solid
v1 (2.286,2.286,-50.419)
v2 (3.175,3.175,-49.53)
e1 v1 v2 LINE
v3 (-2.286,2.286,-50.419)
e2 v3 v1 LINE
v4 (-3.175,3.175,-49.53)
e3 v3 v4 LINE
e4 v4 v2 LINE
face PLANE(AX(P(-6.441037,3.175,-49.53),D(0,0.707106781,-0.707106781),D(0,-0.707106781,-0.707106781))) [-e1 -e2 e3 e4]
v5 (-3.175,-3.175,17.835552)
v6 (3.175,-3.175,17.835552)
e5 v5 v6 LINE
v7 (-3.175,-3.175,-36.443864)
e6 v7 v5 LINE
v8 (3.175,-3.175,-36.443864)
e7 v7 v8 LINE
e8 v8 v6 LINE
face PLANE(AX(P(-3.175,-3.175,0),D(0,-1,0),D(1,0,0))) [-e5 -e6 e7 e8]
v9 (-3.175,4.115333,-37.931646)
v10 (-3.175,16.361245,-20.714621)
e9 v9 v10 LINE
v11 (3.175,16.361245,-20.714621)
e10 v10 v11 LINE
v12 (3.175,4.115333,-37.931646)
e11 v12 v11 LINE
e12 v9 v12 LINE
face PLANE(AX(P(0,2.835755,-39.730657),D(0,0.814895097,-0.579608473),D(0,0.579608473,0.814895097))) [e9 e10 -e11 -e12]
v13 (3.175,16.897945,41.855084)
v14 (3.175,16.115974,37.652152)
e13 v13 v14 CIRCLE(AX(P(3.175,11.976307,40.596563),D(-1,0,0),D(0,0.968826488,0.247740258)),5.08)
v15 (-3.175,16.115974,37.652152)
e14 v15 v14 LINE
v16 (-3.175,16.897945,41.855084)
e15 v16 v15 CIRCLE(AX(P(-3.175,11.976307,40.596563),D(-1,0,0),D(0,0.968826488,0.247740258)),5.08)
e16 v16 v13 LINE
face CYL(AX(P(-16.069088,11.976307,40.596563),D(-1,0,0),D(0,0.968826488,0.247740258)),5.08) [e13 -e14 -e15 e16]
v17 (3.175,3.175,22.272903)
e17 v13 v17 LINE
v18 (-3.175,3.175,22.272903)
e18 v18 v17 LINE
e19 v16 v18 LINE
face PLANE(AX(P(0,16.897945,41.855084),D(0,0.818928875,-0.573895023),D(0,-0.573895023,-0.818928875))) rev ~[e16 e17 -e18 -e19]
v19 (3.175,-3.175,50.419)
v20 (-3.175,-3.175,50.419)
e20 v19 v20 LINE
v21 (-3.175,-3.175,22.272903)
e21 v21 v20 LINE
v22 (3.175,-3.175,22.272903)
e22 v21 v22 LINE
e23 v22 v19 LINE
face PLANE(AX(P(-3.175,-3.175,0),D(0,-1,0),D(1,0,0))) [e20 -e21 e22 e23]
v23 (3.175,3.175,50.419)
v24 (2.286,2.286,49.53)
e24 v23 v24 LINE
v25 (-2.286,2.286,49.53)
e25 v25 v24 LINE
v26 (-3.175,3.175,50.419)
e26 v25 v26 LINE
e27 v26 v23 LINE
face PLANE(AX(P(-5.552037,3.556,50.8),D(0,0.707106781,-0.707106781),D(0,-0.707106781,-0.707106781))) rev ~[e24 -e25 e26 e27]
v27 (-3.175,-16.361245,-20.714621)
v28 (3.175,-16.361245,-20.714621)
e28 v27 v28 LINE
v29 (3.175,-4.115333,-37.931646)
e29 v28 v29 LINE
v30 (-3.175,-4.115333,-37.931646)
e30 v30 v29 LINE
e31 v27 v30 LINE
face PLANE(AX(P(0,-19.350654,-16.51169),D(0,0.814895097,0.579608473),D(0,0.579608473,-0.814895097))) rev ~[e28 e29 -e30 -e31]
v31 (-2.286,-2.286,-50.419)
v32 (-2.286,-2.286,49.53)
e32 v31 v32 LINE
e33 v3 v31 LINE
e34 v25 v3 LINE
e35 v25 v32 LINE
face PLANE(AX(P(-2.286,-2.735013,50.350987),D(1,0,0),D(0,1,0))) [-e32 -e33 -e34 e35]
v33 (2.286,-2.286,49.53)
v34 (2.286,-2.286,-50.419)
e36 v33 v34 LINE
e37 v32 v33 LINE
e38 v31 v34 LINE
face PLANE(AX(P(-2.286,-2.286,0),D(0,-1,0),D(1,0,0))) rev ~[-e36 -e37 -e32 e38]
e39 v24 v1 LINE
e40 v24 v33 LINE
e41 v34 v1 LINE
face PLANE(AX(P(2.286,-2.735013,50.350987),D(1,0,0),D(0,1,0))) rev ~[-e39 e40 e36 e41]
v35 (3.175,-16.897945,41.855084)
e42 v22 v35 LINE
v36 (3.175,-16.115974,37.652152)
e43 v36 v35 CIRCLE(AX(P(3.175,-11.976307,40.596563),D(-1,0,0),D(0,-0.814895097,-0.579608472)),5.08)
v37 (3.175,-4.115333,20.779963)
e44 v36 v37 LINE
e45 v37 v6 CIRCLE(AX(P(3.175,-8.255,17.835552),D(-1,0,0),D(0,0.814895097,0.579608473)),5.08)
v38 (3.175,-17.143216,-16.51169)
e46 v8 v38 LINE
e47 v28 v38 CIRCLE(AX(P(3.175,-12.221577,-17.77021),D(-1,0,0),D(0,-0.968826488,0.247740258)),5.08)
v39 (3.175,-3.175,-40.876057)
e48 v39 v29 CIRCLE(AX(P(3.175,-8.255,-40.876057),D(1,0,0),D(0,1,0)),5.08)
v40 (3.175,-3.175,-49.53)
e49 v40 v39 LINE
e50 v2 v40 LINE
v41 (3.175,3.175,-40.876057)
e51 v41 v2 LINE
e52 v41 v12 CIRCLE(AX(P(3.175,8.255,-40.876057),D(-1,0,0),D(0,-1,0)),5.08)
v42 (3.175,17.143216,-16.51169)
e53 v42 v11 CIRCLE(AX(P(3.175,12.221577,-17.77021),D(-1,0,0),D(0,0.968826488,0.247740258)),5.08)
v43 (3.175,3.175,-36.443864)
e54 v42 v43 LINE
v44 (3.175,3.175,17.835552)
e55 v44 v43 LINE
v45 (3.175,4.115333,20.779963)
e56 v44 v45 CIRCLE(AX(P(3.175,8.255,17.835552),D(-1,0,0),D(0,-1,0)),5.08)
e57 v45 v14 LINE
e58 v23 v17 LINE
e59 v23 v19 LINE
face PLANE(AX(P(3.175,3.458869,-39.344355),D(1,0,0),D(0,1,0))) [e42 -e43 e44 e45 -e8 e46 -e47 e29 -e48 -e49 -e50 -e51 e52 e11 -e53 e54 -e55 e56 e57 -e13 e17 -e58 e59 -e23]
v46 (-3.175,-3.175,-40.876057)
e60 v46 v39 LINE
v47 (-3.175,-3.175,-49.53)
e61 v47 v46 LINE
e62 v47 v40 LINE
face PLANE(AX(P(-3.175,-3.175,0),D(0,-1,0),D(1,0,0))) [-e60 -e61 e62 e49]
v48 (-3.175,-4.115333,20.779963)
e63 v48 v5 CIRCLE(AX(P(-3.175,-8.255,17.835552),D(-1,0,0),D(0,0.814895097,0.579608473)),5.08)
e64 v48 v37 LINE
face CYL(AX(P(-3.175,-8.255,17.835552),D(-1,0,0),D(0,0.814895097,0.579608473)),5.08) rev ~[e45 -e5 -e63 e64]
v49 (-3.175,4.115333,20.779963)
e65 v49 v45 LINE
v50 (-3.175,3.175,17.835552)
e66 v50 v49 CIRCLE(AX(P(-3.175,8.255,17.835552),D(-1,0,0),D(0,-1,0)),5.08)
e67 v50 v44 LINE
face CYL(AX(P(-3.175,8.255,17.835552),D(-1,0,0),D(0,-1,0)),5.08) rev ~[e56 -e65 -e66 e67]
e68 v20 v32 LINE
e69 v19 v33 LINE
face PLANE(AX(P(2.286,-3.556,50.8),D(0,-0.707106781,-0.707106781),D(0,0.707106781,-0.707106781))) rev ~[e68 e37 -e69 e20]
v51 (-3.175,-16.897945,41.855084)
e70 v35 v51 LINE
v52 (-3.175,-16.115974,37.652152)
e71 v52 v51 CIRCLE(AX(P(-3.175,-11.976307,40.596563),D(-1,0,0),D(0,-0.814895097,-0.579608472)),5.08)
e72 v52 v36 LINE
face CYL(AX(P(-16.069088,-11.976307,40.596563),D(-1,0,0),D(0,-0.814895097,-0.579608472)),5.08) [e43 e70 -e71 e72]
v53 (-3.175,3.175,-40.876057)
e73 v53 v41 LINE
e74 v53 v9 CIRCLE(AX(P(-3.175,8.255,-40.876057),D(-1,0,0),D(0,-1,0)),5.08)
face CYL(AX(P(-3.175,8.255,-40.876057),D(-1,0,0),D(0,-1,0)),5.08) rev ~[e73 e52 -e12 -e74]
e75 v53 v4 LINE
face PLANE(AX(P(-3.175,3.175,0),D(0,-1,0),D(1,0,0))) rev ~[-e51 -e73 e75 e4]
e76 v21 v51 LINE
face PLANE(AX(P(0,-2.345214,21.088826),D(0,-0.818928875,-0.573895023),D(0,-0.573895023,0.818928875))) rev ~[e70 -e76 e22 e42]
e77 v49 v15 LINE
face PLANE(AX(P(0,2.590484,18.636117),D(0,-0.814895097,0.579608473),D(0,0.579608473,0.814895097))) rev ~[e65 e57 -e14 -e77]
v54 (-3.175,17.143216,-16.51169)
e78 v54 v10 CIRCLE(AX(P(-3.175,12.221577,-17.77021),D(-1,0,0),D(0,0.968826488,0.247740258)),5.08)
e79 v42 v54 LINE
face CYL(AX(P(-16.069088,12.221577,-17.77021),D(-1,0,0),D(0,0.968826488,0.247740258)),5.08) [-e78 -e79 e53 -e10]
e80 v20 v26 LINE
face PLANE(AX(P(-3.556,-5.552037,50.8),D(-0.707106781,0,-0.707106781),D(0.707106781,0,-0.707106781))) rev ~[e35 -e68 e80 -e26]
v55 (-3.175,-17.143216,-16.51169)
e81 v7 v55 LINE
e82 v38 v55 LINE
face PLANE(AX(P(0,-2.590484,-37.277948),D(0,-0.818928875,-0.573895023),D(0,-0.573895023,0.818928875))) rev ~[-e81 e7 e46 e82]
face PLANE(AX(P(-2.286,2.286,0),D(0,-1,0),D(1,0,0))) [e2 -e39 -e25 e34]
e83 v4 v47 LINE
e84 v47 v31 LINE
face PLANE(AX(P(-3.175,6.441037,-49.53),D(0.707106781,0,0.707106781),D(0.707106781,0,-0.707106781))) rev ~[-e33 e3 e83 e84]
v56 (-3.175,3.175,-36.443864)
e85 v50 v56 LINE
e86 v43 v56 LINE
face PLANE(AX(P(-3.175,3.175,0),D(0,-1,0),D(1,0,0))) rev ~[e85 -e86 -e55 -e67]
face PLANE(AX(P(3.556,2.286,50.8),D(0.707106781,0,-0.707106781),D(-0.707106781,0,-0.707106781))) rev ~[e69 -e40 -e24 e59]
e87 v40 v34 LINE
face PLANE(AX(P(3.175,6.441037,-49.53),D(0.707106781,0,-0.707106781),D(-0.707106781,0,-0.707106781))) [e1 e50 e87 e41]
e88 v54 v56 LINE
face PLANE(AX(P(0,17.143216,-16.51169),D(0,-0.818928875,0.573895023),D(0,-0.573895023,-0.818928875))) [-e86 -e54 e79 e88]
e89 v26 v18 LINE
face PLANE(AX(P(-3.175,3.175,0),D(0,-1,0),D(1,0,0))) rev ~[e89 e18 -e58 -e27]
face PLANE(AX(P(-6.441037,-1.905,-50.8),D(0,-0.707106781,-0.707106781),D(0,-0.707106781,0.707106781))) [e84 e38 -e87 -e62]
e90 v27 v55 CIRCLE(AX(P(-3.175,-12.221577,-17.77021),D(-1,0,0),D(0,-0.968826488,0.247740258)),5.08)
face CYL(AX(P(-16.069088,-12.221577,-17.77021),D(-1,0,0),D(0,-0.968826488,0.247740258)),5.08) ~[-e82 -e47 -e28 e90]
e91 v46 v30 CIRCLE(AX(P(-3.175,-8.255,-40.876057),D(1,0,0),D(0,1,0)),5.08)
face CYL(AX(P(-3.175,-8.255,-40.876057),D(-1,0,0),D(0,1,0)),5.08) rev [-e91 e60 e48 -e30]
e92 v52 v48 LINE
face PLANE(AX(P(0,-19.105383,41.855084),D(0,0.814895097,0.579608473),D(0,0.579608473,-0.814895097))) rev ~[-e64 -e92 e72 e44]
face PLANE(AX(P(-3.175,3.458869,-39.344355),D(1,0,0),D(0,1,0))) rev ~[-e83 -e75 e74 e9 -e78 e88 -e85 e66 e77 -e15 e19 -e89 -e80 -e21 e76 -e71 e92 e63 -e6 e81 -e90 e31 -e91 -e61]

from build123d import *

# Parameters (mm, degrees)
F0_W         = 6.35
F0_H         = 6.35
F0_W_2       = 4.572
F0_H_2       = 4.572
F1_DEPTH     = 50.8
F3_T1_DEPTH  = 4.572
F3_T3_DEPTH  = 4.572
F3_T9_DEPTH  = 7.8380373947
F3_T15_DEPTH = 7.8380373947
F3_T24_DEPTH = 7.8380373947
F3_T30_DEPTH = 7.8380373947
F3_T39_DEPTH = 7.8380373947
F3_T45_DEPTH = 7.8380373947
F3_T54_DEPTH = 7.8380373947
F3_T60_DEPTH = 7.8380373947
F4_T1_DEPTH  = 12.8820747894
F4_T3_DEPTH  = 12.8820747894
F5_DEPTH     = 3.175
F6_T1_DEPTH  = 6.35
F6_T3_DEPTH  = 6.35
F6_T5_DEPTH  = 6.35
F6_T7_DEPTH  = 6.35
F6_T9_DEPTH  = 32.1381754825
F6_T11_DEPTH = 32.1381754825
F6_T13_DEPTH = 32.1381754825
F6_T15_DEPTH = 32.1381754825


# Not quite as in the source:
# - a fillet or chamfer that OpenCascade refuses, or shapes differently, is made with other operations: its cross-section is extruded or revolved along the edge and cut away or added


with BuildPart() as f1:
    # F0 (on Top) → F1 (new body, symmetric)
    with BuildSketch(Plane.XY):
        Rectangle(F0_W, F0_H)
        Rectangle(F0_W_2, F0_H_2, mode=Mode.SUBTRACT)
    extrude(amount=F1_DEPTH, both=True)

    # F3: chamfer of 1.27 on 4 edges, made by hand

    # F3_s2 → F3_t1 (cut)
    with BuildSketch(Plane.YZ.offset(-2.286)):
        Polygon((3.556, 50.8), (2.286, 49.53), (2.286, 50.8), align=None)
        Polygon((-3.556, 50.8), (-2.286, 49.53), (-2.286, 50.8), align=None)
    extrude(amount=F3_T1_DEPTH, mode=Mode.SUBTRACT)

    # F3_s4 → F3_t3 (cut)
    with BuildSketch(Plane.XZ.offset(-2.286)):
        Polygon((-3.556, 50.8), (-2.286, 49.53), (-2.286, 50.8), align=None)
        Polygon((3.556, 50.8), (2.286, 49.53), (2.286, 50.8), align=None)
    extrude(amount=F3_T3_DEPTH, mode=Mode.SUBTRACT)


with BuildPart() as f3_tool7:
    # F3_s8 → F3_t9 (new body)
    with BuildSketch(Plane.YZ.offset(-5.5520373947)):
        Polygon((3.556, 50.8), (2.286, 49.53), (2.286, 50.8), align=None)
    extrude(amount=F3_T9_DEPTH)

    split(bisect_by=Plane.YZ.offset(-3.175), keep=Keep.TOP)

    split(bisect_by=Plane.YZ.offset(-2.286), keep=Keep.BOTTOM)

    split(bisect_by=Plane.XZ.offset(-3.175), keep=Keep.TOP)


with BuildPart() as f3_tool13:
    # F3_s14 → F3_t15 (new body)
    with BuildSketch(Plane.XZ.offset(2.286)):
        Polygon((-3.556, 50.8), (-2.286, 49.53), (-2.286, 50.8), align=None)
    extrude(amount=-F3_T15_DEPTH)

    split(bisect_by=Plane.YZ.offset(-3.175), keep=Keep.TOP)

    split(bisect_by=Plane.XZ.offset(-2.286), keep=Keep.BOTTOM)

    split(bisect_by=Plane.XZ.offset(-3.175), keep=Keep.TOP)


with BuildPart() as f3_tool7_1:
    add(f3_tool7.part)

    # F3_t19: intersect F3_tool13
    add(f3_tool13.part, mode=Mode.INTERSECT)


with BuildPart() as f1_1:
    add(f1.part)

    # F3_t5: cut F3_tool7
    add(f3_tool7_1.part, mode=Mode.SUBTRACT)


with BuildPart() as f3_tool22:
    # F3_s23 → F3_t24 (new body)
    with BuildSketch(Plane.YZ.offset(-2.286)):
        Polygon((3.556, 50.8), (2.286, 49.53), (2.286, 50.8), align=None)
    extrude(amount=F3_T24_DEPTH)

    split(bisect_by=Plane.YZ.offset(3.175), keep=Keep.BOTTOM)

    split(bisect_by=Plane.YZ.offset(2.286), keep=Keep.TOP)

    split(bisect_by=Plane.XZ.offset(-3.175), keep=Keep.TOP)


with BuildPart() as f3_tool28:
    # F3_s29 → F3_t30 (new body)
    with BuildSketch(Plane.XZ.offset(-5.5520373947)):
        Polygon((3.556, 50.8), (2.286, 49.53), (2.286, 50.8), align=None)
    extrude(amount=F3_T30_DEPTH)

    split(bisect_by=Plane.YZ.offset(3.175), keep=Keep.BOTTOM)

    split(bisect_by=Plane.XZ.offset(-2.286), keep=Keep.BOTTOM)

    split(bisect_by=Plane.XZ.offset(-3.175), keep=Keep.TOP)


with BuildPart() as f3_tool22_1:
    add(f3_tool22.part)

    # F3_t34: intersect F3_tool28
    add(f3_tool28.part, mode=Mode.INTERSECT)


with BuildPart() as f1_2:
    add(f1_1.part)

    # F3_t20: cut F3_tool22
    add(f3_tool22_1.part, mode=Mode.SUBTRACT)


with BuildPart() as f3_tool37:
    # F3_s38 → F3_t39 (new body)
    with BuildSketch(Plane.YZ.offset(2.286)):
        Polygon((-3.556, 50.8), (-2.286, 49.53), (-2.286, 50.8), align=None)
    extrude(amount=-F3_T39_DEPTH)

    split(bisect_by=Plane.XZ.offset(3.175), keep=Keep.BOTTOM)

    split(bisect_by=Plane.YZ.offset(-3.175), keep=Keep.TOP)

    split(bisect_by=Plane.YZ.offset(-2.286), keep=Keep.BOTTOM)


with BuildPart() as f3_tool43:
    # F3_s44 → F3_t45 (new body)
    with BuildSketch(Plane.XZ.offset(5.5520373947)):
        Polygon((-3.556, 50.8), (-2.286, 49.53), (-2.286, 50.8), align=None)
    extrude(amount=-F3_T45_DEPTH)

    split(bisect_by=Plane.XZ.offset(3.175), keep=Keep.BOTTOM)

    split(bisect_by=Plane.YZ.offset(-3.175), keep=Keep.TOP)

    split(bisect_by=Plane.XZ.offset(2.286), keep=Keep.TOP)


with BuildPart() as f3_tool37_1:
    add(f3_tool37.part)

    # F3_t49: intersect F3_tool43
    add(f3_tool43.part, mode=Mode.INTERSECT)


with BuildPart() as f1_3:
    add(f1_2.part)

    # F3_t35: cut F3_tool37
    add(f3_tool37_1.part, mode=Mode.SUBTRACT)


with BuildPart() as f3_tool52:
    # F3_s53 → F3_t54 (new body)
    with BuildSketch(Plane.XZ.offset(-2.286)):
        Polygon((3.556, 50.8), (2.286, 49.53), (2.286, 50.8), align=None)
    extrude(amount=F3_T54_DEPTH)

    split(bisect_by=Plane.YZ.offset(3.175), keep=Keep.BOTTOM)

    split(bisect_by=Plane.XZ.offset(3.175), keep=Keep.BOTTOM)

    split(bisect_by=Plane.XZ.offset(2.286), keep=Keep.TOP)


with BuildPart() as f3_tool58:
    # F3_s59 → F3_t60 (new body)
    with BuildSketch(Plane.YZ.offset(5.5520373947)):
        Polygon((-3.556, 50.8), (-2.286, 49.53), (-2.286, 50.8), align=None)
    extrude(amount=-F3_T60_DEPTH)

    split(bisect_by=Plane.YZ.offset(3.175), keep=Keep.BOTTOM)

    split(bisect_by=Plane.XZ.offset(3.175), keep=Keep.BOTTOM)

    split(bisect_by=Plane.YZ.offset(2.286), keep=Keep.TOP)


with BuildPart() as f3_tool52_1:
    add(f3_tool52.part)

    # F3_t64: intersect F3_tool58
    add(f3_tool58.part, mode=Mode.INTERSECT)


with BuildPart() as f1_4:
    add(f1_3.part)

    # F3_t50: cut F3_tool52
    add(f3_tool52_1.part, mode=Mode.SUBTRACT)

    # F4: chamfer of 1.27 on 4 edges, made by hand

    # F4_s2 → F4_t1 (cut)
    with BuildSketch(Plane.XZ.offset(-6.4410373947)):
        Polygon((3.175, -49.53), (1.905, -50.8), (3.175, -50.8), align=None)
        Polygon((-3.175, -49.53), (-1.905, -50.8), (-3.175, -50.8), align=None)
    extrude(amount=F4_T1_DEPTH, mode=Mode.SUBTRACT)

    # F4_s4 → F4_t3 (cut)
    with BuildSketch(Plane.YZ.offset(-6.4410373947)):
        Polygon((-1.905, -50.8), (-3.175, -49.53), (-3.175, -50.8), align=None)
        Polygon((3.175, -49.53), (1.905, -50.8), (3.175, -50.8), align=None)
    extrude(amount=F4_T3_DEPTH, mode=Mode.SUBTRACT)

    # F2 (on Right) → F5 (join, symmetric)
    with BuildSketch(Plane.YZ):
        Polygon((-19.1053829622, 41.8550837785), (-2.5904842187, 18.636116758), (-2.3452136666, 21.0888255388), (-16.897945432, 41.8550837785), align=None)
        Polygon((-19.3506535143, -16.5116898715), (-2.8357547708, -39.7306568921), (-2.5904842187, -37.2779481113), (-17.1432159841, -16.5116898715), align=None)
        Polygon((2.5904842187, 18.636116758), (19.1053829622, 41.8550837785), (16.897945432, 41.8550837785), (2.3452136666, 21.0888255388), align=None)
        Polygon((17.1432159841, -16.5116898715), (2.5904842187, -37.2779481113), (2.8357547708, -39.7306568921), (19.3506535143, -16.5116898715), align=None)
    extrude(amount=F5_DEPTH, both=True)

    # F6: fillet of radius 5.08 on 8 edges, made by hand

    # F6_s2 → F6_t1 (join)
    with BuildSketch(Plane.YZ.offset(-3.175)):
        with BuildLine():
            ThreePointArc((-3.175, -40.8760570484), (-3.415789898, -39.3305973794), (-4.1153329089, -37.931646008))
            Line((-4.1153329089, -37.931646008), (-3.175, -39.2536982433))
            Line((-3.175, -39.2536982433), (-3.175, -40.8760570484))
        make_face()
    extrude(amount=F6_T1_DEPTH)

    # F6_s4 → F6_t3 (join)
    with BuildSketch(Plane.YZ.offset(-3.175)):
        with BuildLine():
            ThreePointArc((-4.1153329089, 20.7799634748), (-3.415789898, 19.3810121034), (-3.175, 17.8355524344))
            Line((-3.175, 17.8355524344), (-3.175, 19.4579112395))
            Line((-3.175, 19.4579112395), (-4.1153329089, 20.7799634748))
        make_face()
    extrude(amount=F6_T3_DEPTH)

    # F6_s6 → F6_t5 (join)
    with BuildSketch(Plane.YZ.offset(-3.175)):
        with BuildLine():
            ThreePointArc((3.175, 17.8355524344), (3.415789898, 19.3810121034), (4.1153329089, 20.7799634748))
            Line((4.1153329089, 20.7799634748), (3.175, 19.4579112395))
            Line((3.175, 19.4579112395), (3.175, 17.8355524344))
        make_face()
    extrude(amount=F6_T5_DEPTH)

    # F6_s8 → F6_t7 (join)
    with BuildSketch(Plane.YZ.offset(-3.175)):
        with BuildLine():
            ThreePointArc((3.175, -40.8760570484), (3.415789898, -39.3305973794), (4.1153329089, -37.931646008))
            Line((4.1153329089, -37.931646008), (3.175, -39.2536982433))
            Line((3.175, -39.2536982433), (3.175, -40.8760570484))
        make_face()
    extrude(amount=F6_T7_DEPTH)

    # F6_s10 → F6_t9 (cut)
    with BuildSketch(Plane.YZ.offset(-16.0690877412)):
        with BuildLine():
            ThreePointArc((-17.1432159841, -16.5116898715), (-17.2158715108, -18.6994178747), (-16.3612445142, -20.7146214221))
            Line((-16.3612445142, -20.7146214221), (-19.3506535143, -16.5116898715))
            Line((-19.3506535143, -16.5116898715), (-17.1432159841, -16.5116898715))
        make_face()
    extrude(amount=F6_T9_DEPTH, mode=Mode.SUBTRACT)

    # F6_s12 → F6_t11 (cut)
    with BuildSketch(Plane.YZ.offset(-16.0690877412)):
        with BuildLine():
            ThreePointArc((-16.1159739621, 37.6521522279), (-16.9706009587, 39.6673557754), (-16.897945432, 41.8550837785))
            Line((-16.897945432, 41.8550837785), (-19.1053829622, 41.8550837785))
            Line((-19.1053829622, 41.8550837785), (-16.1159739621, 37.6521522279))
        make_face()
    extrude(amount=F6_T11_DEPTH, mode=Mode.SUBTRACT)

    # F6_s14 → F6_t13 (cut)
    with BuildSketch(Plane.YZ.offset(-16.0690877412)):
        with BuildLine():
            ThreePointArc((16.897945432, 41.8550837785), (16.9706009587, 39.6673557754), (16.1159739621, 37.6521522279))
            Line((16.1159739621, 37.6521522279), (19.1053829622, 41.8550837785))
            Line((19.1053829622, 41.8550837785), (16.897945432, 41.8550837785))
        make_face()
    extrude(amount=F6_T13_DEPTH, mode=Mode.SUBTRACT)

    # F6_s16 → F6_t15 (cut)
    with BuildSketch(Plane.YZ.offset(-16.0690877412)):
        with BuildLine():
            ThreePointArc((17.1432159841, -16.5116898715), (17.2158715108, -18.6994178747), (16.3612445142, -20.7146214221))
            Line((16.3612445142, -20.7146214221), (19.3506535143, -16.5116898715))
            Line((19.3506535143, -16.5116898715), (17.1432159841, -16.5116898715))
        make_face()
    extrude(amount=F6_T15_DEPTH, mode=Mode.SUBTRACT)


solid = f1_4.part
